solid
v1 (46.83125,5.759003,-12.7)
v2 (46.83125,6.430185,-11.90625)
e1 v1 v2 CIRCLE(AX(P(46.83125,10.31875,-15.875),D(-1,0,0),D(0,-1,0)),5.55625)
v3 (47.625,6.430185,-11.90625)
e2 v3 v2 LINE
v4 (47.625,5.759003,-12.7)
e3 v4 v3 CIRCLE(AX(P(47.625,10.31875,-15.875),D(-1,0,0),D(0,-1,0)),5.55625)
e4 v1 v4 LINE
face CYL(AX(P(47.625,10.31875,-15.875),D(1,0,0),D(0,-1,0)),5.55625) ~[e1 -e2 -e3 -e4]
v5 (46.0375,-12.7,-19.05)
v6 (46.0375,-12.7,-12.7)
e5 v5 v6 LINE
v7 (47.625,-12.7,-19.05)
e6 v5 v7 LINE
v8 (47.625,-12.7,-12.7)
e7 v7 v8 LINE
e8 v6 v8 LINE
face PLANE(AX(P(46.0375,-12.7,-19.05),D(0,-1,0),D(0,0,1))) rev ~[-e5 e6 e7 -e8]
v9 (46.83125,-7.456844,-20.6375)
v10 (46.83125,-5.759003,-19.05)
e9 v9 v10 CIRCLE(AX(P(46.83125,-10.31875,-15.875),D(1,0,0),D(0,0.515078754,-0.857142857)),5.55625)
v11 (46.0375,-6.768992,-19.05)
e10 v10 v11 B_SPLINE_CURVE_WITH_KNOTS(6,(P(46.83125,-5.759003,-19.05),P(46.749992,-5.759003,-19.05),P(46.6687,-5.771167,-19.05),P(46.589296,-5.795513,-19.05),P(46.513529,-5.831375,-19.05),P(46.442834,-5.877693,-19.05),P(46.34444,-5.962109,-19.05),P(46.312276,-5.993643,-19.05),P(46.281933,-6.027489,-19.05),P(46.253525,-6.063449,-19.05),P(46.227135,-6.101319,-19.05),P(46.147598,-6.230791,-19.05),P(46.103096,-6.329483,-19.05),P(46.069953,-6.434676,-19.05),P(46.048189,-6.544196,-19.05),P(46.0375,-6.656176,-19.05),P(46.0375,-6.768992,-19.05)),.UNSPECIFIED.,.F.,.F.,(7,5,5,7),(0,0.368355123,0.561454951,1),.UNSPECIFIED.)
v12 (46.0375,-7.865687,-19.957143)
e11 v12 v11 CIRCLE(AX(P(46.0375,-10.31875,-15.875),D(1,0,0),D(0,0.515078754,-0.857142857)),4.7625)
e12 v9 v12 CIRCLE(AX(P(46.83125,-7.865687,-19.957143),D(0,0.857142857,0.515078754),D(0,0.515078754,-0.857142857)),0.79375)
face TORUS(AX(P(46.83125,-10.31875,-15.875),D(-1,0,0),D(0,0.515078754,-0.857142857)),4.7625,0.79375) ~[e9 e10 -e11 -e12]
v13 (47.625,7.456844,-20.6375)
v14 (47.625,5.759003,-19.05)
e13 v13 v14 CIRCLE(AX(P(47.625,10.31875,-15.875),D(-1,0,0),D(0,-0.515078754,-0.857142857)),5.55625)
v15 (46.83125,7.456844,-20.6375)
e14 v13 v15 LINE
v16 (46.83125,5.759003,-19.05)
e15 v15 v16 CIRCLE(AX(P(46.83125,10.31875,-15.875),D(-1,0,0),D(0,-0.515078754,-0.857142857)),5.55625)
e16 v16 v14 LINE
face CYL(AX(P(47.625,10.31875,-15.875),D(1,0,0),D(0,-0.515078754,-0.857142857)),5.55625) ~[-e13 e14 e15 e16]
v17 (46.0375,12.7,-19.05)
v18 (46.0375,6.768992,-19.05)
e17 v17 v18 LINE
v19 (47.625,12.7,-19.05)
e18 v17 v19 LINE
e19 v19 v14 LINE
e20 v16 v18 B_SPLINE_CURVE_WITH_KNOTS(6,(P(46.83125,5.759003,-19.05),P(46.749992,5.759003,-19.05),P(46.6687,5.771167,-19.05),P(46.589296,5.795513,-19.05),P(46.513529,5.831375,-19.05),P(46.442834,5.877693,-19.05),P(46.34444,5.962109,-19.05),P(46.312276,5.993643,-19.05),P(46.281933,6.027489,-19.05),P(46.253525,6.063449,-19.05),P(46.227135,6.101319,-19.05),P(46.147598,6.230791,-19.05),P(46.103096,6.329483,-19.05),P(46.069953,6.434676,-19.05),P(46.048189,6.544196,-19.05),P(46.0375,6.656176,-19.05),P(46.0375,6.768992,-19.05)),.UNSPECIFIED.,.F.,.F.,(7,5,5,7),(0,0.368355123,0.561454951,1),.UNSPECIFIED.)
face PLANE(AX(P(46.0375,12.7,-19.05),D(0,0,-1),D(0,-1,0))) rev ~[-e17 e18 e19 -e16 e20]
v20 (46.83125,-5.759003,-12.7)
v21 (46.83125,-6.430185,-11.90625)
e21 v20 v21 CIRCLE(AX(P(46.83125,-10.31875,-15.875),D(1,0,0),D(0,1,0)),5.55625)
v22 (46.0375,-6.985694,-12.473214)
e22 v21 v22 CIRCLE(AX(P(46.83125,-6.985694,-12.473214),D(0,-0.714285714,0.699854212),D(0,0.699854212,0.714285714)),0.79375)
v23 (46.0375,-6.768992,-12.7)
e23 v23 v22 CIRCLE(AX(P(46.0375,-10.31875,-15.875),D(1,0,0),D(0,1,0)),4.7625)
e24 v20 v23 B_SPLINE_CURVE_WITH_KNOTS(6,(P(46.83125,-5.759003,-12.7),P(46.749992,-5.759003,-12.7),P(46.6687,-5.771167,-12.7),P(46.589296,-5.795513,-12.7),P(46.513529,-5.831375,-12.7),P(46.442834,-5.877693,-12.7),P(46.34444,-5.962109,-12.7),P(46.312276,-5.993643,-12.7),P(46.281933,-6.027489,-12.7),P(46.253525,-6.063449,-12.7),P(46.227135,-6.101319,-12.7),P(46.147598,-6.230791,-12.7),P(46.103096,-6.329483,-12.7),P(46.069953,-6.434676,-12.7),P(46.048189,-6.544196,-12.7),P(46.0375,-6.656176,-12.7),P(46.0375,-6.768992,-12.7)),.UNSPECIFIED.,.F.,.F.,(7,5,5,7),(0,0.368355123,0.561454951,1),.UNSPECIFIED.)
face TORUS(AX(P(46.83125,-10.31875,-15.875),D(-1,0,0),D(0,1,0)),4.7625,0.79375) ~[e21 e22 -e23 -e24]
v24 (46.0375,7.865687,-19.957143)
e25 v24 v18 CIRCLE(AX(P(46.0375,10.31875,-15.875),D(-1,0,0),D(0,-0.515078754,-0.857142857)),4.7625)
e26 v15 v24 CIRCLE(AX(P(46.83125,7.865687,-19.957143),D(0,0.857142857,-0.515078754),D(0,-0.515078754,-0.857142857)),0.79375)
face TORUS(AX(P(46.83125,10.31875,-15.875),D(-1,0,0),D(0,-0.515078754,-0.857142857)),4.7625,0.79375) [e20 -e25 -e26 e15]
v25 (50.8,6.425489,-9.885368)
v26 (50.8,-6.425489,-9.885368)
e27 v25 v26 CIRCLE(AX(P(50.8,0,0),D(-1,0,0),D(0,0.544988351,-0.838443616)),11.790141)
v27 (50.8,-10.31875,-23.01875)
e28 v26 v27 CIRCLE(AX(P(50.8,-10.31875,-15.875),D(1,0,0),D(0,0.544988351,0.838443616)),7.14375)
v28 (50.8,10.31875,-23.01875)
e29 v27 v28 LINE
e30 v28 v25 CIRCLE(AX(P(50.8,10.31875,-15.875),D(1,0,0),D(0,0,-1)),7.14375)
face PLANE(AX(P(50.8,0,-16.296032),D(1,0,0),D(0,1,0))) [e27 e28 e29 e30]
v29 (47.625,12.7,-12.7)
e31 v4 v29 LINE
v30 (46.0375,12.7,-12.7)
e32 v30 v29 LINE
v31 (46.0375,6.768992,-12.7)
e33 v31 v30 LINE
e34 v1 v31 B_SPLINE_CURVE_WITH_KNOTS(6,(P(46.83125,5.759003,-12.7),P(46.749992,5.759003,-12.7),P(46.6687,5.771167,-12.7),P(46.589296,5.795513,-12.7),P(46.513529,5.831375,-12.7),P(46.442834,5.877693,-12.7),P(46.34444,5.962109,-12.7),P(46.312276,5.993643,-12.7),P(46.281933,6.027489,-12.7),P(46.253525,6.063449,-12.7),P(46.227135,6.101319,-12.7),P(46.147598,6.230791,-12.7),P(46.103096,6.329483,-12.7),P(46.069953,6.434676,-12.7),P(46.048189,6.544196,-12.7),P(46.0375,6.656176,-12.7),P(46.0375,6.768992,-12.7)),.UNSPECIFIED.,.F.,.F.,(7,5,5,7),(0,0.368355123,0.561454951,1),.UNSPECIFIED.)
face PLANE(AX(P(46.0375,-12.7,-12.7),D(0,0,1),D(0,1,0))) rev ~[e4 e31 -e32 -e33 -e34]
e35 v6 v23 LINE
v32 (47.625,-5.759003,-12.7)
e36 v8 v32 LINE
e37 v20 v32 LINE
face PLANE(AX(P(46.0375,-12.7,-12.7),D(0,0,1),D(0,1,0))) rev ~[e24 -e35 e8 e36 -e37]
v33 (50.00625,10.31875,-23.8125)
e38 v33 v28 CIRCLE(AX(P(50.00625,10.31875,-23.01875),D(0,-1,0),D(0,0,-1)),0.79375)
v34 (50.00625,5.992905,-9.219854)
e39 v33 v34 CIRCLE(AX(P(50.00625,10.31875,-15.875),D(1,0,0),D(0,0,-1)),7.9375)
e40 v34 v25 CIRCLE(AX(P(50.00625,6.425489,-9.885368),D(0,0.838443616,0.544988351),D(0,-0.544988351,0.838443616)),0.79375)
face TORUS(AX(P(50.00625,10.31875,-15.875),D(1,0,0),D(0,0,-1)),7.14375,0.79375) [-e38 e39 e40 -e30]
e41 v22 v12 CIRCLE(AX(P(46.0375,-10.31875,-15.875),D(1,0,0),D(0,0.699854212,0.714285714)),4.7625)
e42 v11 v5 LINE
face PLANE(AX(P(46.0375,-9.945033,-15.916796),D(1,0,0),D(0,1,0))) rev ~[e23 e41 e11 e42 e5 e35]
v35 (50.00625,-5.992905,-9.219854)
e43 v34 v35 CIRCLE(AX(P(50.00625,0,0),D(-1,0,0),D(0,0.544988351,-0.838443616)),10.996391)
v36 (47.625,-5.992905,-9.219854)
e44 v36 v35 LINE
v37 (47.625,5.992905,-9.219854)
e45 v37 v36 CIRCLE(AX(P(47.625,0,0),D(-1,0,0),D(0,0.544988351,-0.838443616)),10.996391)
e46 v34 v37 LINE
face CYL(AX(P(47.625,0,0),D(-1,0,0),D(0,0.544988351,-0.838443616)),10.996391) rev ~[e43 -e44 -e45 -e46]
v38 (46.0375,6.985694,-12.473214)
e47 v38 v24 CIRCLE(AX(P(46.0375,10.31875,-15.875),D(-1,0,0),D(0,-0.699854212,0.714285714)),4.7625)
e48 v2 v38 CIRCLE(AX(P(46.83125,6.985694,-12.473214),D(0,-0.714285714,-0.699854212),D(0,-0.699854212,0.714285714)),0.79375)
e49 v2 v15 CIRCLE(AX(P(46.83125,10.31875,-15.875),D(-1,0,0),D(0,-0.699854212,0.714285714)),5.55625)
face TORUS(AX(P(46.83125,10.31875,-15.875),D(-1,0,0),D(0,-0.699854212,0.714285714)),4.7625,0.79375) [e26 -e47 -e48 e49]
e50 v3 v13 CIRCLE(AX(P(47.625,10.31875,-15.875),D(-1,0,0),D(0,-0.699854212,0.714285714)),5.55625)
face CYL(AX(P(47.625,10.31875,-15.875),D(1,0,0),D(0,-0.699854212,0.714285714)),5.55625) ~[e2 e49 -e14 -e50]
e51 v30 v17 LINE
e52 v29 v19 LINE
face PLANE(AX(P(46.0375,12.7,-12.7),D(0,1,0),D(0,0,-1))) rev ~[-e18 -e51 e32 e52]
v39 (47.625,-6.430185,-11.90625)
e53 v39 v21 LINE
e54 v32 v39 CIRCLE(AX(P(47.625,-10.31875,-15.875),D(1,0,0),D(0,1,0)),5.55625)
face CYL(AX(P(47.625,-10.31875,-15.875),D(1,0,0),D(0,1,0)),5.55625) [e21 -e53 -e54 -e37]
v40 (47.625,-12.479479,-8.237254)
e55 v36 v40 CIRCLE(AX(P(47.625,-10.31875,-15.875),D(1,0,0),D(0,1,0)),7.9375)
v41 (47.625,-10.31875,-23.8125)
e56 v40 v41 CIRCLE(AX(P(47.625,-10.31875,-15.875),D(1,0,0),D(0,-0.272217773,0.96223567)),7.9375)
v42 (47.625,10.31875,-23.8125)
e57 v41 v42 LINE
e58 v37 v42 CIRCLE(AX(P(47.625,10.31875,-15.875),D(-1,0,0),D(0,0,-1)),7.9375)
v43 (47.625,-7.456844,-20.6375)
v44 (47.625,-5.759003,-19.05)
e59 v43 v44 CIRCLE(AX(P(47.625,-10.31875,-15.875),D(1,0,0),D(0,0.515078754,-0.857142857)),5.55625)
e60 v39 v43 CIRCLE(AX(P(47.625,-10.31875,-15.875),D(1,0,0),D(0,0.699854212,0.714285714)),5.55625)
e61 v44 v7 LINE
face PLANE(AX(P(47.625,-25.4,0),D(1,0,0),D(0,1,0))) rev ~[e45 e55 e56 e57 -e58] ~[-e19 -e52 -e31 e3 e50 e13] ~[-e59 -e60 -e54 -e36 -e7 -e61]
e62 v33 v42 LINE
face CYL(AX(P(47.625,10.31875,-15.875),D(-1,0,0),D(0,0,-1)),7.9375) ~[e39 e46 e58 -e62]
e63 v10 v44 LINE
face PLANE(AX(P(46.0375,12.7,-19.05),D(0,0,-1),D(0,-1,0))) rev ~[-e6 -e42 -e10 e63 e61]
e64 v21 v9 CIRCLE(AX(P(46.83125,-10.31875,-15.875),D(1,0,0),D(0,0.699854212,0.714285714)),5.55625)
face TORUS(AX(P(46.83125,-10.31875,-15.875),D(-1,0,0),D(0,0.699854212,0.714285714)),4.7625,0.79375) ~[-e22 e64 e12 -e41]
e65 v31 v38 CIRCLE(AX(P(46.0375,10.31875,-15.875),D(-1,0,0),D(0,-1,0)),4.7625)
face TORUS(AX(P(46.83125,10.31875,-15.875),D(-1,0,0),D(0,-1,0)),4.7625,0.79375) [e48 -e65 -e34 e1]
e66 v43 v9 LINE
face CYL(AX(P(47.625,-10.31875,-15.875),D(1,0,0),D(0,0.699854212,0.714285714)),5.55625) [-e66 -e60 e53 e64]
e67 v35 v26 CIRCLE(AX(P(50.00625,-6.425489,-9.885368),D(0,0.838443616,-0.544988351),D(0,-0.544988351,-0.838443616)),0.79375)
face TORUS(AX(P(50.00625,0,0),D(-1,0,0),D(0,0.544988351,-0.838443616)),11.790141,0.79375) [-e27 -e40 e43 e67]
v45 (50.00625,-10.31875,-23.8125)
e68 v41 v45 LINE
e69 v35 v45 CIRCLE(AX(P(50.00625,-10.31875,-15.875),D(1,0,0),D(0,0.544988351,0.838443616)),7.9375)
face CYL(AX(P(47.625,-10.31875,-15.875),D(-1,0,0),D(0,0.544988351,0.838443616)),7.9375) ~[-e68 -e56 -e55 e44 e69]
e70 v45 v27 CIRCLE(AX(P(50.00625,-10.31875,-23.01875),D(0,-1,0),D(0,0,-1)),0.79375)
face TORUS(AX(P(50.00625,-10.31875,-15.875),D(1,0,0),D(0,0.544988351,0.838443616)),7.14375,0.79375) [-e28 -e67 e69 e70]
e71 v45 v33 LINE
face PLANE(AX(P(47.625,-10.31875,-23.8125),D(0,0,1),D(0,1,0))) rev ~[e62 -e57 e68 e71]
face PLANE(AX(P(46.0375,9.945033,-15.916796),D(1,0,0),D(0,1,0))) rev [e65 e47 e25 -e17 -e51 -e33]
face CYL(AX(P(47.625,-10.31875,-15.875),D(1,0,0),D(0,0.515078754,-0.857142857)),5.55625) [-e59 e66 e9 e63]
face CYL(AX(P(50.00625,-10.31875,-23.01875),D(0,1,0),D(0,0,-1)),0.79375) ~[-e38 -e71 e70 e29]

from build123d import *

# Parameters (mm, degrees)
F0_R           = 5.55625
F1_DEPTH       = 47.625
F0_R_2         = 6.5484375
F2_DEPTH       = 19.05
F4_DEPTH       = 28.575
F5_W           = 8.73125
F5_H           = 8.73125
F6_DEPTH       = 47.626
F7_R           = 4.365625
F8_DEPTH       = 9.525
F8_DEPTH_BACK  = 9.525
F10_DEPTH      = 9.525
F12_D          = 2.7051
F12_DEPTH      = 15.875
F12_TIP        = 0.8126940303
F14_DEPTH      = 3.175
F15_W          = 60.325
F15_H          = 50.8
F16_DEPTH      = 25.4
F16_DEPTH_BACK = 8.73225
F18_DEPTH      = 1.5875
F19_R          = 0.79375
F21_DEPTH      = 1.5875
F22_R          = 0.79375


# Not quite as in the source:
# - a pattern or mirror of a feature is missing from the dataset's text; its kind, count and spacing are read off the source's solid
# - a feature names something its author has since deleted; it is built from what else it names


with BuildPart() as f1:
    # F0 (on Right) → F1 (new body)
    with BuildSketch(Plane.YZ):
        with BuildLine():
            ThreePointArc((18.25625, -15.875), (16.6494169978, -11.0868310793), (12.4794785699, -8.2372543707))
            ThreePointArc((12.4794785699, -8.2372543707), (2.4565457231, -14.7842891497), (10.31875, -23.8125))
            ThreePointArc((10.31875, -23.8125), (15.9314100757, -21.4876600757), (18.25625, -15.875))
        make_face()
        with Locations((10.31875, -15.875)):
            Circle(F0_R, mode=Mode.SUBTRACT)
    extrude(amount=F1_DEPTH)



with BuildPart() as f1b:
    # F0 (on Right) → F1, piece 2 (new body)
    with BuildSketch(Plane.YZ):
        with BuildLine():
            ThreePointArc((-2.38125, -15.875), (-5.5305810793, -9.5443330022), (-12.4794785699, -8.2372543707))
            ThreePointArc((-12.4794785699, -8.2372543707), (-18.1809542769, -16.9657108503), (-10.31875, -23.8125))
            ThreePointArc((-10.31875, -23.8125), (-4.7060899243, -21.4876600757), (-2.38125, -15.875))
        make_face()
        with Locations((-10.31875, -15.875)):
            Circle(F0_R, mode=Mode.SUBTRACT)
    extrude(amount=F1_DEPTH)


with BuildPart() as f1_1:
    add(f1.part)

    add(f1b.part)  # F2 merges F1b
    # F0 (on Right) → F2 (join)
    with BuildSketch(Plane.YZ):
        with BuildLine():
            ThreePointArc((8.5506596809, -1.7666198185), (8.6859850881, -0.8879130653), (8.73125, 0))
            ThreePointArc((8.73125, 0), (-0.8879130653, 8.6859850881), (-8.5506596809, -1.7666198185))
            ThreePointArc((-8.5506596809, -1.7666198185), (0, -8.73125), (8.5506596809, -1.7666198185))
        make_face()
        Circle(F0_R_2, mode=Mode.SUBTRACT)
        with BuildLine():
            ThreePointArc((8.5506596809, -1.7666198185), (0, -8.73125), (-8.5506596809, -1.7666198185))
            ThreePointArc((-8.5506596809, -1.7666198185), (-9.2426468573, -5.7745223181), (-12.4794785699, -8.2372543707))
            ThreePointArc((-12.4794785699, -8.2372543707), (-5.5305810793, -9.5443330022), (-2.38125, -15.875))
            ThreePointArc((-2.38125, -15.875), (-4.7060899243, -21.4876600757), (-10.31875, -23.8125))
            Line((-10.31875, -23.8125), (10.31875, -23.8125))
            ThreePointArc((10.31875, -23.8125), (2.4565457231, -14.7842891497), (12.4794785699, -8.2372543707))
            ThreePointArc((12.4794785699, -8.2372543707), (9.2426468573, -5.7745223181), (8.5506596809, -1.7666198185))
        make_face()
    extrude(amount=F2_DEPTH)

    # F3 (on face) → F4 (join, through all)
    with BuildSketch(Plane.YZ.offset(47.625)):
        with BuildLine():
            ThreePointArc((5.9929049671, -9.2198537956), (0, -10.9963909515), (-5.9929049671, -9.2198537956))
            ThreePointArc((-5.9929049671, -9.2198537956), (-3.3423504559, -12.0890053287), (-2.38125, -15.875))
            ThreePointArc((-2.38125, -15.875), (-4.7060899243, -21.4876600757), (-10.31875, -23.8125))
            Line((-10.31875, -23.8125), (10.31875, -23.8125))
            ThreePointArc((10.31875, -23.8125), (2.7085880685, -18.1309569203), (5.9929049671, -9.2198537956))
        make_face()
    extrude(amount=-F4_DEPTH)

    # F5 (on face) → F6 (cut, through all)
    with BuildSketch(Plane(origin=(0, 0, 0), x_dir=(0, -1, 0), z_dir=(-1, 0, 0))):
        with Locations((0, -16.271875)):
            Rectangle(F5_W, F5_H)
    extrude(amount=-F6_DEPTH, mode=Mode.SUBTRACT)

    # F7 (on Front) → F8 (cut, two sides)
    with BuildSketch(Plane.XZ) as f8_sk:
        with Locations((0, -16.271875)):
            Circle(F7_R)
        with Locations((47.625, -16.271875)):
            Circle(F7_R)
    extrude(amount=-F8_DEPTH, mode=Mode.SUBTRACT)
    extrude(f8_sk.sketch, amount=F8_DEPTH_BACK, mode=Mode.SUBTRACT)

    # F9 (on face) → F10 (cut)
    with BuildSketch(Plane(origin=(0, 0, -11.90625), x_dir=(1, 0, 0), z_dir=(0, 0, -1))):
        with BuildLine():
            ThreePointArc((0, -4.3352987234), (2.7498472571, -2.8996680512), (3.8519455094, 0))
            ThreePointArc((3.8519455094, 0), (2.7498472571, 2.8996680512), (0, 4.3352987234))
            Line((0, 4.3352987234), (0, -4.3352987234))
        make_face()
        with BuildLine():
            Line((0, -4.3352987234), (0, 4.3352987234))
            ThreePointArc((0, 4.3352987234), (-4.8793044906, 0), (0, -4.3352987234))
        make_face()
    extrude(amount=-F10_DEPTH, mode=Mode.SUBTRACT)

    # F12
    with Locations(Plane(origin=(0, 0, 0), x_dir=(0, -1, 0), z_dir=(-1, 0, 0))):
        with Locations((7.14375, -7.9375), (-7.14375, -7.9375)):
            Hole(F12_D / 2, depth=F12_DEPTH)
            with Locations((0, 0, -(F12_DEPTH + F12_TIP / 2))):  # 118° drill point
                Cone(0, F12_D / 2, F12_TIP, mode=Mode.SUBTRACT)

    # F13 (on face) → F14 (join)
    with BuildSketch(Plane.YZ.offset(47.625)):
        with BuildLine():
            ThreePointArc((5.9929049671, -9.2198537956), (0, -10.9963909515), (-5.9929049671, -9.2198537956))
            ThreePointArc((-5.9929049671, -9.2198537956), (-17.9289119315, -13.6190430797), (-10.31875, -23.8125))
            Line((-10.31875, -23.8125), (10.31875, -23.8125))
            ThreePointArc((10.31875, -23.8125), (17.9289119315, -13.6190430797), (5.9929049671, -9.2198537956))
        make_face()
        with BuildLine():
            ThreePointArc((-7.4568436751, -20.6375), (-15.8369831688, -15.2261419591), (-6.4301850333, -11.90625))
            Line((-6.4301850333, -11.90625), (-4.365625, -11.90625))
            Line((-4.365625, -11.90625), (4.365625, -11.90625))
            Line((4.365625, -11.90625), (6.4301850333, -11.90625))
            ThreePointArc((6.4301850333, -11.90625), (12.4711991825, -10.7526102668), (15.875, -15.875))
            ThreePointArc((15.875, -15.875), (13.054663654, -20.7109787572), (7.4568436751, -20.6375))
            Line((7.4568436751, -20.6375), (4.365625, -20.6375))
            Line((4.365625, -20.6375), (-4.365625, -20.6375))
            Line((-4.365625, -20.6375), (-7.4568436751, -20.6375))
        make_face(mode=Mode.SUBTRACT)
        with BuildLine():
            Line((-4.365625, -11.90625), (-6.4301850333, -11.90625))
            ThreePointArc((-6.4301850333, -11.90625), (-15.8369831688, -15.2261419591), (-7.4568436751, -20.6375))
            Line((-7.4568436751, -20.6375), (-4.365625, -20.6375))
            Line((-4.365625, -20.6375), (4.365625, -20.6375))
            Line((4.365625, -20.6375), (7.4568436751, -20.6375))
            ThreePointArc((7.4568436751, -20.6375), (13.054663654, -20.7109787572), (15.875, -15.875))
            ThreePointArc((15.875, -15.875), (12.4711991825, -10.7526102668), (6.4301850333, -11.90625))
            Line((6.4301850333, -11.90625), (4.365625, -11.90625))
            Line((4.365625, -11.90625), (-4.365625, -11.90625))
        make_face()
    extrude(amount=F14_DEPTH)

    # F15 (on Top) → F16 (cut, two sides)
    with BuildSketch(Plane.XY) as f16_sk:
        with Locations((17.4625, 0)):
            Rectangle(F15_W, F15_H)
    extrude(amount=-F16_DEPTH, mode=Mode.SUBTRACT)
    extrude(f16_sk.sketch, amount=F16_DEPTH_BACK, mode=Mode.SUBTRACT)

    # F17 (on face) → F18 (join)
    with BuildSketch(Plane.YZ.offset(47.625)):
        with BuildLine():
            ThreePointArc((-7.4568436751, -20.6375), (-5.4827712428, -18.610913654), (-4.7625, -15.875))
            ThreePointArc((-4.7625, -15.875), (-5.1963602668, -13.7225508175), (-6.4301850333, -11.90625))
            ThreePointArc((-6.4301850333, -11.90625), (-15.8369831688, -15.2261419591), (-7.4568436751, -20.6375))
        make_face()
    f18 = extrude(amount=-F18_DEPTH)

    # F18_copies: F18 across plane
    add(f18.mirror(Plane.ZX))

    # F19
    f19_edges = [f1_1.edges().sort_by_distance(p)[0] for p in [
        (46.0375, 13.180656, -11.1125),
        (46.0375, -13.180656, -11.1125),
    ]]
    fillet(f19_edges, radius=F19_R)

    # F20 (on face) → F21 (cut)
    with BuildSketch(Plane(origin=(46.0375, 0, 0), x_dir=(0, -1, 0), z_dir=(-1, 0, 0))):
        with BuildLine():
            Line((6.7689920857, -12.7), (-12.7, -12.7))
            Line((-12.7, -12.7), (-12.7, -19.05))
            Line((-12.7, -19.05), (6.7689920857, -19.05))
            ThreePointArc((6.7689920857, -19.05), (5.55625, -15.875), (6.7689920857, -12.7))
        make_face()
        with BuildLine():
            Line((12.7, -12.7), (6.7689920857, -12.7))
            ThreePointArc((6.7689920857, -12.7), (5.55625, -15.875), (6.7689920857, -19.05))
            Line((6.7689920857, -19.05), (12.7, -19.05))
            Line((12.7, -19.05), (12.7, -12.7))
        make_face()
    extrude(amount=-F21_DEPTH, mode=Mode.SUBTRACT)

    # F22
    f22_edges = [f1_1.edges().sort_by_distance(p)[0] for p in [
        (50.8, 17.928912, -13.619043),
        (50.8, 0, -10.996391),
        (50.8, -17.928912, -13.619043),
        (50.8, 0, -23.8125),
    ]]
    fillet(f22_edges, radius=F22_R)


solid = f1_1.part
